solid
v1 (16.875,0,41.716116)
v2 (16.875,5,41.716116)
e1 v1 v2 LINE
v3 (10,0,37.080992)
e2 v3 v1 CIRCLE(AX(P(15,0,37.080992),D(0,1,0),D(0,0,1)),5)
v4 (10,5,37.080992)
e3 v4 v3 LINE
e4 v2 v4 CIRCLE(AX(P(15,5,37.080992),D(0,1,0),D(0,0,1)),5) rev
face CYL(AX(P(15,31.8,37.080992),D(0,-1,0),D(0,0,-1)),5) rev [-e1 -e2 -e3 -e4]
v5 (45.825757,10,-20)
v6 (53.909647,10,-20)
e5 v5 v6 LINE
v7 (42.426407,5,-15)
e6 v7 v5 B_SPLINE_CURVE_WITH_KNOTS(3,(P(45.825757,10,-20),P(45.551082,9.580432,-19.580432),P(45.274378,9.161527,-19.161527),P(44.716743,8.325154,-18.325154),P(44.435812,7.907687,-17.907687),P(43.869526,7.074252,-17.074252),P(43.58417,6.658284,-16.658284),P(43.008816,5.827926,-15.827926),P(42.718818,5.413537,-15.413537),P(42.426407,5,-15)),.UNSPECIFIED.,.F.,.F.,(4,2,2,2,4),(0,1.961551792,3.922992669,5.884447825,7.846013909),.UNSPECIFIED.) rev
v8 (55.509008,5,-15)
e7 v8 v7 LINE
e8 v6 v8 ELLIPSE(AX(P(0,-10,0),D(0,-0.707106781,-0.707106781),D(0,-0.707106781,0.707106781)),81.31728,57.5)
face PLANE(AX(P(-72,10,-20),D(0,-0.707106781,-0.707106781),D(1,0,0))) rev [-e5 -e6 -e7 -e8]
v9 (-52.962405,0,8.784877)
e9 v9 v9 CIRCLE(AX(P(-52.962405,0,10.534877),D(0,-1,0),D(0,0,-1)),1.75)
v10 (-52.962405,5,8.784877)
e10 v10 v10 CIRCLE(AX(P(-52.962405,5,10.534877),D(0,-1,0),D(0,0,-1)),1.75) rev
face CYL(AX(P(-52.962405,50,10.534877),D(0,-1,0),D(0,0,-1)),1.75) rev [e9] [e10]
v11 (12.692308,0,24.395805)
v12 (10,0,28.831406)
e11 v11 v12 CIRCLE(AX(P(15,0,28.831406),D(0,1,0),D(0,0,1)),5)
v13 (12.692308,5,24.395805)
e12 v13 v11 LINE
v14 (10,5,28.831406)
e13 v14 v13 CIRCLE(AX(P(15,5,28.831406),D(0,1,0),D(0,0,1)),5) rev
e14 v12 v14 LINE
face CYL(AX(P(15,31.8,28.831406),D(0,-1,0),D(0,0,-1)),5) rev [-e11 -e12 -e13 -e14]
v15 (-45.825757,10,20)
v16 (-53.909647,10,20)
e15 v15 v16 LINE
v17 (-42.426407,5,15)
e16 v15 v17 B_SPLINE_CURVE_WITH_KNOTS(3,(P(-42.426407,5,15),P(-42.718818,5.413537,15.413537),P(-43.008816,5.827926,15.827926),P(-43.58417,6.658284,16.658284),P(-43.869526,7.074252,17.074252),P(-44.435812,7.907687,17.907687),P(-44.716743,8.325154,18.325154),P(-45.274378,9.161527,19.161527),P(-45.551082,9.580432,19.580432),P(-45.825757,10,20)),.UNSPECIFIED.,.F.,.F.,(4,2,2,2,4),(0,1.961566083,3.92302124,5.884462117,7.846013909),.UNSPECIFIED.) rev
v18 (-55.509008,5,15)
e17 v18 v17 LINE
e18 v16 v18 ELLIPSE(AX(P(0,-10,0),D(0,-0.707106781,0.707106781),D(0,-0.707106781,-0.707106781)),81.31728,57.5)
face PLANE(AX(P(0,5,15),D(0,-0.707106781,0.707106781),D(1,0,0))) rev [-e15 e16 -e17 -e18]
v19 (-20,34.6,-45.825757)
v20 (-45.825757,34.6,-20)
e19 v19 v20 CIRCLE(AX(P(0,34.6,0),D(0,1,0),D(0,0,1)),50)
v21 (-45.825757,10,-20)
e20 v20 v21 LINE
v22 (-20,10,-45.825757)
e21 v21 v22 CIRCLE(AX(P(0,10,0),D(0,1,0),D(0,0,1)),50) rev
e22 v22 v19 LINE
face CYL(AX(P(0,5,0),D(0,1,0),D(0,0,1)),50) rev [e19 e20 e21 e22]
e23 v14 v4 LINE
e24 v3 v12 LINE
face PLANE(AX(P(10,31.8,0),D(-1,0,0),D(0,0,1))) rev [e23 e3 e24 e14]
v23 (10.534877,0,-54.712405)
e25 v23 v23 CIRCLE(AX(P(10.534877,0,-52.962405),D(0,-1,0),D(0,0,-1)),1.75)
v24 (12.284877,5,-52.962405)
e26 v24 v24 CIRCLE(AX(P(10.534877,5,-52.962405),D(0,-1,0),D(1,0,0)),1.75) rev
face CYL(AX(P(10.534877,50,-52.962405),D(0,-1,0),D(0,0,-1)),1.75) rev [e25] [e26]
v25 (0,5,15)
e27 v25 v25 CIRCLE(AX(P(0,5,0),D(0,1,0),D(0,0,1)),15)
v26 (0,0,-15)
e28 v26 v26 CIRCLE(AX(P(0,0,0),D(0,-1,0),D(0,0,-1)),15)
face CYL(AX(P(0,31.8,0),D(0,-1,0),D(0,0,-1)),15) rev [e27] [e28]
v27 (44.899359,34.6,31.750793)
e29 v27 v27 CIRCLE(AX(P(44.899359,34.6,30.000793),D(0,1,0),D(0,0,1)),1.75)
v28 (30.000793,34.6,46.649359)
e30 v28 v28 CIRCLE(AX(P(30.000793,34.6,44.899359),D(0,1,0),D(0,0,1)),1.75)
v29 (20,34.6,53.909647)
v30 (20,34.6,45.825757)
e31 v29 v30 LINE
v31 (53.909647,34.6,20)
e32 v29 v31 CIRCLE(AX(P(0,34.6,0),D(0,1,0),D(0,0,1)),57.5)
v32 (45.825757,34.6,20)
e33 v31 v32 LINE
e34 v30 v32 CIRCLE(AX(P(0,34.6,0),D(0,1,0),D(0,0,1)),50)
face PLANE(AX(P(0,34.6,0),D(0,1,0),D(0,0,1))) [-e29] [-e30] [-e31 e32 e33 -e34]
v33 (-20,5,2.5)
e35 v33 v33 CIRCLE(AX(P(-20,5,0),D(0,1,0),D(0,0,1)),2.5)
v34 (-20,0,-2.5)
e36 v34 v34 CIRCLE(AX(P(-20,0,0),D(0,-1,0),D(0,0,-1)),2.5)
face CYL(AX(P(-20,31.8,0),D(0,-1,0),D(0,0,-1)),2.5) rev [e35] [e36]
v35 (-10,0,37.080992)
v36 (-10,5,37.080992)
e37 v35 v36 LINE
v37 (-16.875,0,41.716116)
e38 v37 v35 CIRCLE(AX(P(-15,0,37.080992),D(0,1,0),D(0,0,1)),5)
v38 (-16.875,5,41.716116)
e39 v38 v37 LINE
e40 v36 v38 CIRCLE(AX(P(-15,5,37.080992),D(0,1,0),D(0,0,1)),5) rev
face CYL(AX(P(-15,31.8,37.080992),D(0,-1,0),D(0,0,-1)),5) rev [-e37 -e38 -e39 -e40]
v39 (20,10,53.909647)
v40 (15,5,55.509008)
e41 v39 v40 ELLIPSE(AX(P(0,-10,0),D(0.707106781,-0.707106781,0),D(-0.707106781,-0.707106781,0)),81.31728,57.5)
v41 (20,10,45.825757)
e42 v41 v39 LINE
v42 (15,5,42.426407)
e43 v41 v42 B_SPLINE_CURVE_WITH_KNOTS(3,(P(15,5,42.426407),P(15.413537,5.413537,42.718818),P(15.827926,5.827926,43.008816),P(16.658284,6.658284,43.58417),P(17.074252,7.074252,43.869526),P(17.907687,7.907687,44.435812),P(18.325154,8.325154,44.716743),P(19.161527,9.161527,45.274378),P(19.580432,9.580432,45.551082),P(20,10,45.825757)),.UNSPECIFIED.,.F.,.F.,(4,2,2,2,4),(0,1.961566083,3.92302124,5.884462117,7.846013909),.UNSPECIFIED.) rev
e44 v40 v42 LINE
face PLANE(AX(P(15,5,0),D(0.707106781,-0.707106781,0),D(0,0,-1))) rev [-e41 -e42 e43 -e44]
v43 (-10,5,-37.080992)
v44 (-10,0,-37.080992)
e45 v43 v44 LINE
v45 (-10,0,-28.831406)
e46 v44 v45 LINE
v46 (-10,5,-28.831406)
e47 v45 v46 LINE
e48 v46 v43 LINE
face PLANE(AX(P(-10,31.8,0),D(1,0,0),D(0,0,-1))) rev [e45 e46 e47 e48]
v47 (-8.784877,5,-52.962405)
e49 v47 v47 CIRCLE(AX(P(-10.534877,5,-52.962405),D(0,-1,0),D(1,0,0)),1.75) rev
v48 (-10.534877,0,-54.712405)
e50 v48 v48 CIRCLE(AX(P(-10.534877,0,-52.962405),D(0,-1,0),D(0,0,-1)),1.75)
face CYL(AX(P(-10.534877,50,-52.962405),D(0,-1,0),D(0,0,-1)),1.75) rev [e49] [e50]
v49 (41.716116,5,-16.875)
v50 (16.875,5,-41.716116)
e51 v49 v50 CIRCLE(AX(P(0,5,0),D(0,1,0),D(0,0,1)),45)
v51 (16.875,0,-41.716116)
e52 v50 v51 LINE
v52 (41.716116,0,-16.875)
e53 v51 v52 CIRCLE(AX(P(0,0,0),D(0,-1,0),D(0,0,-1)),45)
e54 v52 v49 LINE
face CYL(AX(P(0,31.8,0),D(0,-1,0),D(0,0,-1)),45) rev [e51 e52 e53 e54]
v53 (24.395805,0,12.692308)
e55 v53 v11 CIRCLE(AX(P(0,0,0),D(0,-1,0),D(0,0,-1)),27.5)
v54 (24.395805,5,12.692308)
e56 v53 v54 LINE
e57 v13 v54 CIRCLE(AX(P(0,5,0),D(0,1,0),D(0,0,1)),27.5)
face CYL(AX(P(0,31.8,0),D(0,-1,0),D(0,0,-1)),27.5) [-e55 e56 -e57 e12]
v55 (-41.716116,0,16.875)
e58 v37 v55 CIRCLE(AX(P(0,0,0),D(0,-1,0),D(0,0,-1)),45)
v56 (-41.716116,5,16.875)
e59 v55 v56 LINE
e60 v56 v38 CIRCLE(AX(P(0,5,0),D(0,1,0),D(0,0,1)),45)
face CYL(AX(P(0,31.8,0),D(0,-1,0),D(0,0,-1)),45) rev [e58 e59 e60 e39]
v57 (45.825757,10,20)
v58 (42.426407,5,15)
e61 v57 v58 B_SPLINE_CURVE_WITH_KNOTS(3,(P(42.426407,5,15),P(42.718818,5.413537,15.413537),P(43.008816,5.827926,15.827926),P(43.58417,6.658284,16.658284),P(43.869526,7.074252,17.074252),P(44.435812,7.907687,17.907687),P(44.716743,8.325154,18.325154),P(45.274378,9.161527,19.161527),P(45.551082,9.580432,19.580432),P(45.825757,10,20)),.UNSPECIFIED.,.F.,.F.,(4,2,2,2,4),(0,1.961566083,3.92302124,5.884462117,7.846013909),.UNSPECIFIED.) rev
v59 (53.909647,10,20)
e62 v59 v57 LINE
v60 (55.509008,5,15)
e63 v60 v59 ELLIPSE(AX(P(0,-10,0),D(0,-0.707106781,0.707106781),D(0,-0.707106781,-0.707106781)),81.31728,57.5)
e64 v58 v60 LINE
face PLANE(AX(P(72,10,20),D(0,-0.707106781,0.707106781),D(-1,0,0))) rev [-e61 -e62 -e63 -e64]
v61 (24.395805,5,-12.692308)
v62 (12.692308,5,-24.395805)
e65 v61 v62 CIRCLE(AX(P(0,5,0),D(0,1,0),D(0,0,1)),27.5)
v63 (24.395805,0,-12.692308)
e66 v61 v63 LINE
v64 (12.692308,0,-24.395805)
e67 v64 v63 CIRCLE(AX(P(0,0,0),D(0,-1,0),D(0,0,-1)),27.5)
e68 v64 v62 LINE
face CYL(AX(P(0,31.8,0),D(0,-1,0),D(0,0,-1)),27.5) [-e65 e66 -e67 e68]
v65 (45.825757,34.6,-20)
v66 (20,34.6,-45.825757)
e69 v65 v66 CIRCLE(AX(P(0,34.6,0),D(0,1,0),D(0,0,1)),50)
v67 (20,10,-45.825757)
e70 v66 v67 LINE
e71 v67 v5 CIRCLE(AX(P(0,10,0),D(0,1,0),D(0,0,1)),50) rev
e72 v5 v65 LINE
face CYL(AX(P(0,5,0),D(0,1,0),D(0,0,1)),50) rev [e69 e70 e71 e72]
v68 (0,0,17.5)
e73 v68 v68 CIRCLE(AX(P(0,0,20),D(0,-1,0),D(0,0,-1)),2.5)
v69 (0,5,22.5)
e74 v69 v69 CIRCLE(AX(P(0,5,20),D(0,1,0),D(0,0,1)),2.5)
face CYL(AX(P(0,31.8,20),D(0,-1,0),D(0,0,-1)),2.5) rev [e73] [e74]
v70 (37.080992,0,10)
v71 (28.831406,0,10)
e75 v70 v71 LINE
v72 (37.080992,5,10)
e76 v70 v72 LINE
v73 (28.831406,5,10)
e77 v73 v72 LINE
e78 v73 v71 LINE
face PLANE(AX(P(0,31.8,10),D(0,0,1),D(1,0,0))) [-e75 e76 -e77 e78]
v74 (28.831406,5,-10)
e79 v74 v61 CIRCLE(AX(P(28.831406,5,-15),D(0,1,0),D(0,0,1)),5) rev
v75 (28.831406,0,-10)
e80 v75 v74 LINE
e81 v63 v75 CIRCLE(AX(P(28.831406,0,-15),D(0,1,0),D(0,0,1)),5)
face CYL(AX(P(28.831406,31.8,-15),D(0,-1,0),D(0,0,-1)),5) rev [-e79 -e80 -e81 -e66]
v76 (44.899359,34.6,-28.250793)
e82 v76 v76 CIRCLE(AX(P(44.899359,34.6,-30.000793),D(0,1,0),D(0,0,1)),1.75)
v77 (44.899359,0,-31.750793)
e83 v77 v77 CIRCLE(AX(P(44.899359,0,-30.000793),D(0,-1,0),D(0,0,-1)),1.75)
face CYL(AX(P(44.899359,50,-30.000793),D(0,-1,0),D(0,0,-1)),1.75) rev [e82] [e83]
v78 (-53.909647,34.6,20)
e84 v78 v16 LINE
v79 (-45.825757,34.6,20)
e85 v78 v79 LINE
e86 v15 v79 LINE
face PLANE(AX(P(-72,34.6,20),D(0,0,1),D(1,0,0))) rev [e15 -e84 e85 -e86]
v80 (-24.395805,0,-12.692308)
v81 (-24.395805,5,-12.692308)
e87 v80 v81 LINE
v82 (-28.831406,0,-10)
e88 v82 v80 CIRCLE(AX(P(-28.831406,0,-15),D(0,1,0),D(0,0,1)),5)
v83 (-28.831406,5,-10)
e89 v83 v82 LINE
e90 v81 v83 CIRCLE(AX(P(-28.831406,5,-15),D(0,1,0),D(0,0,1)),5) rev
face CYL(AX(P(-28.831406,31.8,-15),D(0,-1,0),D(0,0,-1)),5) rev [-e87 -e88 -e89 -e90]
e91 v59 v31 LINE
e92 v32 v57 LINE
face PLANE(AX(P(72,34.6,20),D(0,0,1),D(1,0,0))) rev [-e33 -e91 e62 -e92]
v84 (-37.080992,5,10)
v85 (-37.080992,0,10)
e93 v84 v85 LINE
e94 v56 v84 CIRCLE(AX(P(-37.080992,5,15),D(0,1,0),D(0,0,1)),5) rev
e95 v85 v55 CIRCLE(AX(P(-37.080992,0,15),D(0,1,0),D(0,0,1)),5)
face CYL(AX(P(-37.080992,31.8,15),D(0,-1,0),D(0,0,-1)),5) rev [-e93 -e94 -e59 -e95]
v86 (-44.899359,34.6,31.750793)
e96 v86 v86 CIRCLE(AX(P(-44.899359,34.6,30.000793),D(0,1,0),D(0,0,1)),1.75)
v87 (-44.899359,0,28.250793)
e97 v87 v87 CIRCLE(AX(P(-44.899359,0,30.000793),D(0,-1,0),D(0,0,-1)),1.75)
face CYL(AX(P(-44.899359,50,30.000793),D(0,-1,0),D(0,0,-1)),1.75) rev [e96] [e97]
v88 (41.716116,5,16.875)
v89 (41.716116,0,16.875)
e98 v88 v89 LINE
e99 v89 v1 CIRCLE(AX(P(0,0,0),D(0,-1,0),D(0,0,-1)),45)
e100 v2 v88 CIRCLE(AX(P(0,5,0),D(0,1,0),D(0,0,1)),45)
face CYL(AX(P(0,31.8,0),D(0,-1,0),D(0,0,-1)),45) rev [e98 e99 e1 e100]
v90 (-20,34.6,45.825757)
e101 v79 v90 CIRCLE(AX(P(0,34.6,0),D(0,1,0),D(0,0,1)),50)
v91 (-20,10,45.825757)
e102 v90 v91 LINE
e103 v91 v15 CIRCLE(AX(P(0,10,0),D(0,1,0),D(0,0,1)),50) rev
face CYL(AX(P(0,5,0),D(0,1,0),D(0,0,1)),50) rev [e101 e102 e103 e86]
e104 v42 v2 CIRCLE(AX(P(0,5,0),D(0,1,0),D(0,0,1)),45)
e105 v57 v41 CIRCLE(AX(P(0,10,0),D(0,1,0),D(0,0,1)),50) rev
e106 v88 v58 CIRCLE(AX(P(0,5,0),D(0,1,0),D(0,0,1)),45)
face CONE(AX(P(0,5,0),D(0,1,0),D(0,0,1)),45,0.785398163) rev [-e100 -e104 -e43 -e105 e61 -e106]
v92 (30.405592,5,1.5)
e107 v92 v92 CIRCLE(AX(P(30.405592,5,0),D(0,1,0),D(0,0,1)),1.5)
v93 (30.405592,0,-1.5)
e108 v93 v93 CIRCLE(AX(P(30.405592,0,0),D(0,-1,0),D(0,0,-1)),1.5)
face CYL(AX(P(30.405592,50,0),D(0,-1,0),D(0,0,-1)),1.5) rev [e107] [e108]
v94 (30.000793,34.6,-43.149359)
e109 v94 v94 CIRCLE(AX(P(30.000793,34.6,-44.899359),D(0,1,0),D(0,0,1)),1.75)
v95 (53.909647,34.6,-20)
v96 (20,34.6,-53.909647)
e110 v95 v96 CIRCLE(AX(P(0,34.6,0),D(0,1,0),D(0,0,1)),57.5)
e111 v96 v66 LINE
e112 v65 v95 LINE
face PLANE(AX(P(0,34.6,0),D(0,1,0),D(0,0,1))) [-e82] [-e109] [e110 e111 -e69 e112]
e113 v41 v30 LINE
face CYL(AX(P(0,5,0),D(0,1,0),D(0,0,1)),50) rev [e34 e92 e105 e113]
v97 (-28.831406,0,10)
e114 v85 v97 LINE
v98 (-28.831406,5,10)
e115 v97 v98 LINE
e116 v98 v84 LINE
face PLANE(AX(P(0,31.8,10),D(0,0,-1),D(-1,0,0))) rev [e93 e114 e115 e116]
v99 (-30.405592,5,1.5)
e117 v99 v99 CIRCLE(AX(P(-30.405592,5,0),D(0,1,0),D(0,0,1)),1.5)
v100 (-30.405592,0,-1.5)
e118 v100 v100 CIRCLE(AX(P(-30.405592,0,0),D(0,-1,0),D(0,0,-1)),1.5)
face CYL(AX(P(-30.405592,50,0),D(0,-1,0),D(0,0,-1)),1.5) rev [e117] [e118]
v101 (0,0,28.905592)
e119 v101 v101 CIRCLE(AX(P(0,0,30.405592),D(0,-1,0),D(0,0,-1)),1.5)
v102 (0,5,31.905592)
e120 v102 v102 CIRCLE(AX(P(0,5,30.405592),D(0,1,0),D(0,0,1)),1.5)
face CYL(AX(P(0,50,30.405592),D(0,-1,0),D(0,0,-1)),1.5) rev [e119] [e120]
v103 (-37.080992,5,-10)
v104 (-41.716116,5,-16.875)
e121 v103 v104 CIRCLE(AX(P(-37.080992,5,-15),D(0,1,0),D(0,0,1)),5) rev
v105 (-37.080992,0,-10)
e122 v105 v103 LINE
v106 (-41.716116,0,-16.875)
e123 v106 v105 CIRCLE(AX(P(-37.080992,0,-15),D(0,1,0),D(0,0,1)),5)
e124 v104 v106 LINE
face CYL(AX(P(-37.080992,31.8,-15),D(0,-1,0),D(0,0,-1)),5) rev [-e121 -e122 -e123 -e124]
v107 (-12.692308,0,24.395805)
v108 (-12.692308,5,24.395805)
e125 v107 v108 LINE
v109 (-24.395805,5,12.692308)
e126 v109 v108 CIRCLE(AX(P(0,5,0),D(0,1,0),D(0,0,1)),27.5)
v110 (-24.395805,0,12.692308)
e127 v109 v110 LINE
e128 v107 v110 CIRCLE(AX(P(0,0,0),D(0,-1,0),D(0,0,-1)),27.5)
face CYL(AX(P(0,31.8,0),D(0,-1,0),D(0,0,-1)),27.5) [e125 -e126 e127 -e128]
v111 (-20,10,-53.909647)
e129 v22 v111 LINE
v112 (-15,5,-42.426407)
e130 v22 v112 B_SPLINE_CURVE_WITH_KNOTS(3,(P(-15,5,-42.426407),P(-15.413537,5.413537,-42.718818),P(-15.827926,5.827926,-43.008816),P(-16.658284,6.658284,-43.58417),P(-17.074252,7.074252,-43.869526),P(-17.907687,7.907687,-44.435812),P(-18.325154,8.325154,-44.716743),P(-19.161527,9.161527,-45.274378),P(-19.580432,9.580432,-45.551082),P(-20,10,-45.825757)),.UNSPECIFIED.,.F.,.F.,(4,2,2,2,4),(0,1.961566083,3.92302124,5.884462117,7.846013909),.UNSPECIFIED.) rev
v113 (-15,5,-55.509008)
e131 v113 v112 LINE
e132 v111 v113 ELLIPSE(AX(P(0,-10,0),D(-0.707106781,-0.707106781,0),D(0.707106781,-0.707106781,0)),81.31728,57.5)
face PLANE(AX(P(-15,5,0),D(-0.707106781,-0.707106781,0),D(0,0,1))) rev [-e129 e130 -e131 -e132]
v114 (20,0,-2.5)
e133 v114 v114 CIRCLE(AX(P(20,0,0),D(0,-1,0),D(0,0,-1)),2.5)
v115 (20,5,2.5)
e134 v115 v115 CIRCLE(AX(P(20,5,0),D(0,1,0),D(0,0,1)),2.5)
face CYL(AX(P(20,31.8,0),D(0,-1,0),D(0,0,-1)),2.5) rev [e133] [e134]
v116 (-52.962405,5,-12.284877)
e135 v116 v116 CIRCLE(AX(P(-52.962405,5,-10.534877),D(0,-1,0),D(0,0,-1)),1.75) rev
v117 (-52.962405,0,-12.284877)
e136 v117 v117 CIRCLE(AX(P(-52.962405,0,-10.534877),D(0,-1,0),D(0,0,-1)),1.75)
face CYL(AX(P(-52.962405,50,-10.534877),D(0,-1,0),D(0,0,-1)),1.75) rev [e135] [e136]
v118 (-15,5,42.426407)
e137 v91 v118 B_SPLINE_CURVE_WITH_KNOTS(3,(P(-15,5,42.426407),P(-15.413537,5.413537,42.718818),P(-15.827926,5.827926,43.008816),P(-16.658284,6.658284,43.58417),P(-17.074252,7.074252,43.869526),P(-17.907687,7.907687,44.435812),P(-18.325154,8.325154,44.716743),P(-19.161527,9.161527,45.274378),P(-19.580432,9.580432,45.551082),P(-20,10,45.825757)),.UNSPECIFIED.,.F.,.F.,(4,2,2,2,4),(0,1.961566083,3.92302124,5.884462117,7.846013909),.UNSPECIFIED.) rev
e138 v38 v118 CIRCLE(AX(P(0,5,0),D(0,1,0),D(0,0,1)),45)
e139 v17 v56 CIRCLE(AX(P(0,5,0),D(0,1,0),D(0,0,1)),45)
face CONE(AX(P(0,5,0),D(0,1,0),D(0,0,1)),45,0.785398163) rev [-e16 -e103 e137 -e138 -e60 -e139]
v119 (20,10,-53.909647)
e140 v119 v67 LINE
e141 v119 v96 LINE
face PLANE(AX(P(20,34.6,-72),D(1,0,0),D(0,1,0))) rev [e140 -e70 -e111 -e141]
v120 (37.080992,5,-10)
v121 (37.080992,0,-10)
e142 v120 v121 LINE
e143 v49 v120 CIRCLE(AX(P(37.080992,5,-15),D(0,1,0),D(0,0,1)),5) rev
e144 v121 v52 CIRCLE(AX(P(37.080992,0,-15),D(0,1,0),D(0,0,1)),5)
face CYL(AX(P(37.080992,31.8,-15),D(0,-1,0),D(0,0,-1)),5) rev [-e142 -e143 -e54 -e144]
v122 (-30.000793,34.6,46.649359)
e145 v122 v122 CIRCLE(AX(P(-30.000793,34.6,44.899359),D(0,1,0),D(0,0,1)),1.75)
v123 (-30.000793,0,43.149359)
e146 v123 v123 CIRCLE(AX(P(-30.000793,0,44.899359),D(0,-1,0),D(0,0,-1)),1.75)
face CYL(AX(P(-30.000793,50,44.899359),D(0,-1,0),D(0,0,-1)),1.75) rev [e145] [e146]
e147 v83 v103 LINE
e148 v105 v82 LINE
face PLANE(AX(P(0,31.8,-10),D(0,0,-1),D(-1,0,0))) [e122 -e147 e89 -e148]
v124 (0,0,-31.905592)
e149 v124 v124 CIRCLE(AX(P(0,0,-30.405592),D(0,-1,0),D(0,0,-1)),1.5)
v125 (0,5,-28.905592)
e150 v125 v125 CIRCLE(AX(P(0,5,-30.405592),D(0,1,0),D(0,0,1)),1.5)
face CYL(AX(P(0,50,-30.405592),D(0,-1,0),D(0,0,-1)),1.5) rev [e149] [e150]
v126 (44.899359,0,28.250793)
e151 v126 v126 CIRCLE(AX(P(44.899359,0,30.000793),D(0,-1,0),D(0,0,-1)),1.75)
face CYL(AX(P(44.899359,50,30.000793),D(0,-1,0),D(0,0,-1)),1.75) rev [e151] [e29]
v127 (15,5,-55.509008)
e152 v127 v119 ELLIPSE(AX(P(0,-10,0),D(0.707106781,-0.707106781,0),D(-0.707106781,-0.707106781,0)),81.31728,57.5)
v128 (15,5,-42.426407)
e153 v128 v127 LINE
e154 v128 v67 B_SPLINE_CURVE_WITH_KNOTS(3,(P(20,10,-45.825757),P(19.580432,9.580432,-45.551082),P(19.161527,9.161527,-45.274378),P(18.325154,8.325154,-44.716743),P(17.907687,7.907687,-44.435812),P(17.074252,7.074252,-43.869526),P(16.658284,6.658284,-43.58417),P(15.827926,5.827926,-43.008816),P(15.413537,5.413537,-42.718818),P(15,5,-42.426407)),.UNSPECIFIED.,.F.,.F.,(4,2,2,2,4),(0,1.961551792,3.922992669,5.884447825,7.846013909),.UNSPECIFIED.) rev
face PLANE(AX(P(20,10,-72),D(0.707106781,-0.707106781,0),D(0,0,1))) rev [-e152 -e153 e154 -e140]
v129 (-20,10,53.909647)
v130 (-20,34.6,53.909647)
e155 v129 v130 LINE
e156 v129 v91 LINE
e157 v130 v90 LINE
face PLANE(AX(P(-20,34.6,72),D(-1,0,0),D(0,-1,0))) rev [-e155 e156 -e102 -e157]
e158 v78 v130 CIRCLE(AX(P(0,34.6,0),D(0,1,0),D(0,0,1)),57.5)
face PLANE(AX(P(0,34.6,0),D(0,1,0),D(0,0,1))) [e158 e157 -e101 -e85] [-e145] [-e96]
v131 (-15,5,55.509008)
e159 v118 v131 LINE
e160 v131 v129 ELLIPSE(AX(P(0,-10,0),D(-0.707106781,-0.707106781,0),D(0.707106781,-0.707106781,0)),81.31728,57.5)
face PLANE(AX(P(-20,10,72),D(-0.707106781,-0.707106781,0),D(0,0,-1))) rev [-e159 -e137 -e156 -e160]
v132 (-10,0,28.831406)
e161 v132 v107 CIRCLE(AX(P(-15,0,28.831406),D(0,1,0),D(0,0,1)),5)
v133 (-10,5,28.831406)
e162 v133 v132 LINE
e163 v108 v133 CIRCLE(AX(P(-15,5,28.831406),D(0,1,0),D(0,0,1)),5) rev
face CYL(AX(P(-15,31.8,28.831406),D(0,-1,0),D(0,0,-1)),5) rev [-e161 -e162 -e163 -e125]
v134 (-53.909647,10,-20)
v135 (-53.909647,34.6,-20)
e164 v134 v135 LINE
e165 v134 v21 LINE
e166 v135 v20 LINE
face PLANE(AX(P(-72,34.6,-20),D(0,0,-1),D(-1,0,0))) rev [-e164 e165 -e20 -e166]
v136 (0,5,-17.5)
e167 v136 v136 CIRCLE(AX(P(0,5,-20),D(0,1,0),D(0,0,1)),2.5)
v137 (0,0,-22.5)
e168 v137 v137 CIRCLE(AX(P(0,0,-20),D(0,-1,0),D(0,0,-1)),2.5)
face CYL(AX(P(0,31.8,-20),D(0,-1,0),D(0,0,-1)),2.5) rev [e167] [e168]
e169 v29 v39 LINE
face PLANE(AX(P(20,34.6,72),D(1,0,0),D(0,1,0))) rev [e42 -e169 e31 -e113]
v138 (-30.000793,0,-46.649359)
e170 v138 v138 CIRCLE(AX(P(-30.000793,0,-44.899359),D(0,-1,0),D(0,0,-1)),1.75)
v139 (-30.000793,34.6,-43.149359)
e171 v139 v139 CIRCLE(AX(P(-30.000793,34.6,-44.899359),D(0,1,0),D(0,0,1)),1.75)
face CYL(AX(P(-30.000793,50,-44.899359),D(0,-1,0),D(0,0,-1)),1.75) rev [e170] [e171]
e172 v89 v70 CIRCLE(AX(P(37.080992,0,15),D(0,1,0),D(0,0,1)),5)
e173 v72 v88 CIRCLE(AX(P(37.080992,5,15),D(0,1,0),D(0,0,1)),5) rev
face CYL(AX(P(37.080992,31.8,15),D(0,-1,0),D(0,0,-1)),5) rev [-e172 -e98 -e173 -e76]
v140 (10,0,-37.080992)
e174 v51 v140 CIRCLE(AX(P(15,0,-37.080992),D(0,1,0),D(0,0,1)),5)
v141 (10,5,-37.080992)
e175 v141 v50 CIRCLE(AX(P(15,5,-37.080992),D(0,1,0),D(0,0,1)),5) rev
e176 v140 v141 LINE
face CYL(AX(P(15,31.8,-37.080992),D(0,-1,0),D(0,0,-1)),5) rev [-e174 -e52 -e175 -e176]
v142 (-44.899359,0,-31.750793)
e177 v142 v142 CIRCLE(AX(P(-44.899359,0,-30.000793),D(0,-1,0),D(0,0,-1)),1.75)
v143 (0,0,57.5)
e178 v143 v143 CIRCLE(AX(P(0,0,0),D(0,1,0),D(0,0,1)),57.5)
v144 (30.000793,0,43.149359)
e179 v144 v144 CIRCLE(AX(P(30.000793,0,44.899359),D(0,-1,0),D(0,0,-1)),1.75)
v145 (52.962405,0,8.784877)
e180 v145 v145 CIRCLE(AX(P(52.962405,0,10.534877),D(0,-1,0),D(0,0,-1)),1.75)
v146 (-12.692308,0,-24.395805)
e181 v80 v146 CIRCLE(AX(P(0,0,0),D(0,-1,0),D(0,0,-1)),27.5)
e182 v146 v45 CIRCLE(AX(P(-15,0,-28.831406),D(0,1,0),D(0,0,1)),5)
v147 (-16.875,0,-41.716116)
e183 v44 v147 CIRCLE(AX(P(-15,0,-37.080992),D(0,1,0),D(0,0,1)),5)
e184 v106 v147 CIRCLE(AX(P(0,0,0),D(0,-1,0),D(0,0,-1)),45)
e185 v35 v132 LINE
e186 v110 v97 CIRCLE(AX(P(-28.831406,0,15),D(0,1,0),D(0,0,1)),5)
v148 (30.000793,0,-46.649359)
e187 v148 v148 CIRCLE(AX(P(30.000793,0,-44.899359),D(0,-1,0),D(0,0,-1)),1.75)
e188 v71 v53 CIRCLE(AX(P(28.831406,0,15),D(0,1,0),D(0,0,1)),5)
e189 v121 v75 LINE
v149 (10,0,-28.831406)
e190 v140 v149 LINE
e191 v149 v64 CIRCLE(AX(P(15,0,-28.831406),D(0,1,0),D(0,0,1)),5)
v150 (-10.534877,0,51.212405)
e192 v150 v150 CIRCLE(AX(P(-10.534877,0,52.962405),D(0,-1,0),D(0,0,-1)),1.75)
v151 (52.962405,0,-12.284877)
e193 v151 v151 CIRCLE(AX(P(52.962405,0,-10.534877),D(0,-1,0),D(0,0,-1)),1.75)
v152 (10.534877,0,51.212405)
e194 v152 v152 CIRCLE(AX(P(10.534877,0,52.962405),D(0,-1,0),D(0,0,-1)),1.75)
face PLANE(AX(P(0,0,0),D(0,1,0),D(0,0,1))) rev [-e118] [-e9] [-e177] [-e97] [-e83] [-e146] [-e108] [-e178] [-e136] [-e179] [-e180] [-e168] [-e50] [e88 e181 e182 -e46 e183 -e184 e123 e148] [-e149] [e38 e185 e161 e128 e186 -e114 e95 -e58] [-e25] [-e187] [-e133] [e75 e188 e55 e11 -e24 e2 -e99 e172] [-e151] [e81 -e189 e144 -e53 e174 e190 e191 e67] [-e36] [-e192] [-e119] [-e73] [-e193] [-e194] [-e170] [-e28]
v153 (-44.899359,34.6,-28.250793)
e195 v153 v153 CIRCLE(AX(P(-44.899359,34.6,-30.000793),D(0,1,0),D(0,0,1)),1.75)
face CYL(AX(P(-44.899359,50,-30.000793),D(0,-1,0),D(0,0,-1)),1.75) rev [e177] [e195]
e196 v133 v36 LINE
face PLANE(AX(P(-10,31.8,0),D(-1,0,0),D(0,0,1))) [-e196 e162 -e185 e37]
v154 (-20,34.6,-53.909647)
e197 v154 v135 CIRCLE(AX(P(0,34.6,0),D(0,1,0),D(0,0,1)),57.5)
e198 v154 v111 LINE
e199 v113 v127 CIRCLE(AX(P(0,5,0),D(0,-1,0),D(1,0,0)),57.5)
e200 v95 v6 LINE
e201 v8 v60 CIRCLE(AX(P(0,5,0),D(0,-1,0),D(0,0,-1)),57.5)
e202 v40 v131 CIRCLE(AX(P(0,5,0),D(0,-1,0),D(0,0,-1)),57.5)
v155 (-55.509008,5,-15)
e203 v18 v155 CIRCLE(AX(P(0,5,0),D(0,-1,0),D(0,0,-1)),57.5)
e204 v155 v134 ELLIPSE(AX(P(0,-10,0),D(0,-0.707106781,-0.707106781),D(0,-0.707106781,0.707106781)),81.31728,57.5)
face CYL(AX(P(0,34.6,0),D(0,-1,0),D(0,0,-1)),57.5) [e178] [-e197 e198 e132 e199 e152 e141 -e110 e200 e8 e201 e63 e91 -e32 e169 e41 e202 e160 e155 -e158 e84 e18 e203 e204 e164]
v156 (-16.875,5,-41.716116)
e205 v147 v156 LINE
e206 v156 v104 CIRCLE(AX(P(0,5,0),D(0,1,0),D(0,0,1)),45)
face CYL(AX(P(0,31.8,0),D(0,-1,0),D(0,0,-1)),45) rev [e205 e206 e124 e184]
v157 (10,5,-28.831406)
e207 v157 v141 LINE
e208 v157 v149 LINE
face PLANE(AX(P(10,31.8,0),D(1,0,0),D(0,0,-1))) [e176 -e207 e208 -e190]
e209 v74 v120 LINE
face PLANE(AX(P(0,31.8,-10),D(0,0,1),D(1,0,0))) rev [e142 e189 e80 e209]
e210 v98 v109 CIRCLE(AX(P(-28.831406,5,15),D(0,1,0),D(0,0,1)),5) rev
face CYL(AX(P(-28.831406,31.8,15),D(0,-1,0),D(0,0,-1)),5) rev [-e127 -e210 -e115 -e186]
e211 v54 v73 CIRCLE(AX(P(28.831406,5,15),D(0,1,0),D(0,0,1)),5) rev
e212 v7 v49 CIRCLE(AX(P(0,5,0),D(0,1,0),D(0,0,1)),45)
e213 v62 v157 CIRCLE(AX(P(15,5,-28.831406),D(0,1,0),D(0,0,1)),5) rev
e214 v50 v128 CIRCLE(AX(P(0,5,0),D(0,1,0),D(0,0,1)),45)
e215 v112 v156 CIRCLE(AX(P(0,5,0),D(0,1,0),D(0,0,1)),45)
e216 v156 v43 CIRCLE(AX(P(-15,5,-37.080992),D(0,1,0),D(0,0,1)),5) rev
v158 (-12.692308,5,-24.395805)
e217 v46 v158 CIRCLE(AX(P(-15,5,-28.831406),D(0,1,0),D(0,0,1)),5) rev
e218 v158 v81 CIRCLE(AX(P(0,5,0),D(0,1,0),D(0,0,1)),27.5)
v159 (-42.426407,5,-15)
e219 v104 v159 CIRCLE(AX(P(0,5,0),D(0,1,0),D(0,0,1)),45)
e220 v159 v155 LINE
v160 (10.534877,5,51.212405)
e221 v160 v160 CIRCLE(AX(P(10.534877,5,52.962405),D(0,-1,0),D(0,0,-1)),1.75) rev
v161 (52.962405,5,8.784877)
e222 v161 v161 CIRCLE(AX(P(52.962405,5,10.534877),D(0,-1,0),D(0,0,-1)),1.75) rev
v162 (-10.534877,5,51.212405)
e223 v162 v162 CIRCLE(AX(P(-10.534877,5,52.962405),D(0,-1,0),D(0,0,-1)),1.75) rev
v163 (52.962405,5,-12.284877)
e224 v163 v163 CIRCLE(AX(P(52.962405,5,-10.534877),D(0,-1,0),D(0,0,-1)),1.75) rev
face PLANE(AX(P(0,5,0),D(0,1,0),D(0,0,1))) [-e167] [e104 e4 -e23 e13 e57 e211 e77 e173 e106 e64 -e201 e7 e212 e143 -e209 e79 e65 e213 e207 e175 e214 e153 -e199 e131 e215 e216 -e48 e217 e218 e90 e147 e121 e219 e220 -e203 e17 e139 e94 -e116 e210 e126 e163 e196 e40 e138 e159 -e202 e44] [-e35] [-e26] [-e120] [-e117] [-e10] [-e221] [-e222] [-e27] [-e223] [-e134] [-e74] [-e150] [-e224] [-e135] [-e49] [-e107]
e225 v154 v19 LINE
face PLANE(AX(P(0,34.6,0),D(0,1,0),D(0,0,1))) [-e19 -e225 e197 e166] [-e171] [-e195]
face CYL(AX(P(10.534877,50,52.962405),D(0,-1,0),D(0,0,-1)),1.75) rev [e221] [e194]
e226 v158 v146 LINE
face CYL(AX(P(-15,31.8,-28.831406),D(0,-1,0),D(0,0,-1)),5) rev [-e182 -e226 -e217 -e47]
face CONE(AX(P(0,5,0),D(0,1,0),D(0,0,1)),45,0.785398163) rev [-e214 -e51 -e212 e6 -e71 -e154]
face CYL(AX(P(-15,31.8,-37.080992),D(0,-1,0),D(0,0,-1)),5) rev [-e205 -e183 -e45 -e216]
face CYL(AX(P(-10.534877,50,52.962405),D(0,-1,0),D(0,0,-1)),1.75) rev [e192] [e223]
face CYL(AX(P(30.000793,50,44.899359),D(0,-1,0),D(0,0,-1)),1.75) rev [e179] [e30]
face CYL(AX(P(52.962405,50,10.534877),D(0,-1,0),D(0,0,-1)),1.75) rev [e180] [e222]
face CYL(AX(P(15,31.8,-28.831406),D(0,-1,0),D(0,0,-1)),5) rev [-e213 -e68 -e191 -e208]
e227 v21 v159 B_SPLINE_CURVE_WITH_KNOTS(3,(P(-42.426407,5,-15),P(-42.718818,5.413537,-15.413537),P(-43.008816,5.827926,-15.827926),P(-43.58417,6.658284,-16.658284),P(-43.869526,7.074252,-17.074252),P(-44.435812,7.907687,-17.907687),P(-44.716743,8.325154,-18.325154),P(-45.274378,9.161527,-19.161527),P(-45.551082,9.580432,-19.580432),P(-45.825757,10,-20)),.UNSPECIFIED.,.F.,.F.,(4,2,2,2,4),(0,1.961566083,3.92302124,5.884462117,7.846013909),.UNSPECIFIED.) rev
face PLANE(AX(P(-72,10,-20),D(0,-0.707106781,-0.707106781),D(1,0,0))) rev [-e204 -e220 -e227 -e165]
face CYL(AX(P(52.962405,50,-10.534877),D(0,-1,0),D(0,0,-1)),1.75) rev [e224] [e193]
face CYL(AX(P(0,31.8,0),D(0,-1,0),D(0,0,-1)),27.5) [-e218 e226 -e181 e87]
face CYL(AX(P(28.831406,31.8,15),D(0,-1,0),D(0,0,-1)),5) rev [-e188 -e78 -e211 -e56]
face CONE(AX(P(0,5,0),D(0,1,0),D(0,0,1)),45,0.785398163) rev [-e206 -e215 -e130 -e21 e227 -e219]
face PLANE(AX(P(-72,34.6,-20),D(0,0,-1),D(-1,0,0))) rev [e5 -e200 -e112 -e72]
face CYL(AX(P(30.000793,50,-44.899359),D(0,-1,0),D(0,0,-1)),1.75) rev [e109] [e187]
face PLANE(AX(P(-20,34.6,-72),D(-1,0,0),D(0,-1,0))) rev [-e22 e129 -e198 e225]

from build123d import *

# Parameters (mm, degrees)
SKETCH1_R           = 57.5
BOSS_EXTRUDE1_DEPTH = 34.6
SKETCH2_R           = 50
CUT_EXTRUDE1_DEPTH  = 29.6
SKETCH3_R           = 2.5
SKETCH3_R_2         = 15
CUT_EXTRUDE2_DEPTH  = 31.8
SKETCH4_R           = 1.5
SKETCH4_R_2         = 1.75
CUT_EXTRUDE3_DEPTH  = 50
SKETCH9_W           = 40
SKETCH9_H           = 29.6
CUT_EXTRUDE4_DEPTH  = 72
CIRPATTERN1_COUNT   = 4
FILLET2_R           = 5
CHAMFER1_SIZE       = 5


with BuildPart() as part:
    # Sketch1 → Boss-Extrude1 (new body)
    with BuildSketch(Plane(origin=(0, 0, 0), x_dir=(1, 0, 0), z_dir=(0, 1, 0))):
        with Locations(Location((0, 0, 0), (0, 0, 270))):
            Circle(SKETCH1_R)
    extrude(amount=BOSS_EXTRUDE1_DEPTH)

    # Sketch2 → Cut-Extrude1 (cut)
    with BuildSketch(Plane(origin=(0, 34.6, 0), x_dir=(1, 0, 0), z_dir=(0, 1, 0))):
        with Locations(Location((0, 0, 0), (0, 0, 270))):
            Circle(SKETCH2_R)
    extrude(amount=-CUT_EXTRUDE1_DEPTH, mode=Mode.SUBTRACT)

    # Sketch3 → Cut-Extrude2 (cut)
    with BuildSketch(Plane.XZ):
        with BuildLine():
            Line((-10, 25.617376915), (-10, 43.874821937))
            ThreePointArc((-10, 43.874821937), (-31.819805153, 31.819805153), (-43.874821937, 10))
            Line((-43.874821937, 10), (-25.617376915, 10))
            ThreePointArc((-25.617376915, 10), (-19.445436483, 19.445436483), (-10, 25.617376915))
        make_face()
        with BuildLine():
            Line((25.617376915, 10), (43.874821937, 10))
            ThreePointArc((43.874821937, 10), (31.819805153, 31.819805153), (10, 43.874821937))
            Line((10, 43.874821937), (10, 25.617376915))
            ThreePointArc((10, 25.617376915), (19.445436483, 19.445436483), (25.617376915, 10))
        make_face()
        with BuildLine():
            ThreePointArc((10, -43.874821937), (31.819805153, -31.819805153), (43.874821937, -10))
            Line((43.874821937, -10), (25.617376915, -10))
            ThreePointArc((25.617376915, -10), (19.445436483, -19.445436483), (10, -25.617376915))
            Line((10, -25.617376915), (10, -43.874821937))
        make_face()
        with BuildLine():
            ThreePointArc((-43.874821937, -10), (-31.819805153, -31.819805153), (-10, -43.874821937))
            Line((-10, -43.874821937), (-10, -25.617376915))
            ThreePointArc((-10, -25.617376915), (-19.445436483, -19.445436483), (-25.617376915, -10))
            Line((-25.617376915, -10), (-43.874821937, -10))
        make_face()
        with Locations(Location((-20, 0, 0), (0, 0, 270))):
            Circle(SKETCH3_R)
        with Locations(Location((0, 0, 0), (0, 0, 270))):
            Circle(SKETCH3_R_2)
        with Locations(Location((0, 20, 0), (0, 0, 270))):
            Circle(SKETCH3_R)
        with Locations(Location((20, 0, 0), (0, 0, 270))):
            Circle(SKETCH3_R)
        with Locations(Location((0, -20, 0), (0, 0, 270))):
            Circle(SKETCH3_R)
    extrude(amount=-CUT_EXTRUDE2_DEPTH, mode=Mode.SUBTRACT)

    # Sketch4 → Cut-Extrude3 (cut)
    with BuildSketch(Plane.XZ):
        with Locations(Location((0, 30.405591591, 0), (0, 0, 270))):
            Circle(SKETCH4_R)
        with Locations(Location((30.405591591, 0, 0), (0, 0, 270))):
            Circle(SKETCH4_R)
        with Locations(Location((0, -30.405591591, 0), (0, 0, 270))):
            Circle(SKETCH4_R)
        with Locations(Location((-30.405591591, 0, 0), (0, 0, 270))):
            Circle(SKETCH4_R)
        with Locations(Location((-10.534877389, 52.962405142, 0), (0, 0, 270))):
            Circle(SKETCH4_R_2)
        with Locations(Location((10.534877389, 52.962405142, 0), (0, 0, 270))):
            Circle(SKETCH4_R_2)
        with Locations(Location((30.000792583, 44.899359064, 0), (0, 0, 270))):
            Circle(SKETCH4_R_2)
        with Locations(Location((44.899359064, 30.000792583, 0), (0, 0, 270))):
            Circle(SKETCH4_R_2)
        with Locations(Location((52.962405142, 10.534877389, 0), (0, 0, 270))):
            Circle(SKETCH4_R_2)
        with Locations(Location((52.962405142, -10.534877389, 0), (0, 0, 270))):
            Circle(SKETCH4_R_2)
        with Locations(Location((44.899359064, -30.000792583, 0), (0, 0, 270))):
            Circle(SKETCH4_R_2)
        with Locations(Location((30.000792583, -44.899359064, 0), (0, 0, 270))):
            Circle(SKETCH4_R_2)
        with Locations(Location((10.534877389, -52.962405142, 0), (0, 0, 270))):
            Circle(SKETCH4_R_2)
        with Locations(Location((-10.534877389, -52.962405142, 0), (0, 0, 270))):
            Circle(SKETCH4_R_2)
        with Locations(Location((-30.000792583, -44.899359064, 0), (0, 0, 270))):
            Circle(SKETCH4_R_2)
        with Locations(Location((-44.899359064, -30.000792583, 0), (0, 0, 270))):
            Circle(SKETCH4_R_2)
        with Locations(Location((-52.962405142, -10.534877389, 0), (0, 0, 270))):
            Circle(SKETCH4_R_2)
        with Locations(Location((-52.962405142, 10.534877389, 0), (0, 0, 270))):
            Circle(SKETCH4_R_2)
        with Locations(Location((-44.899359064, 30.000792583, 0), (0, 0, 270))):
            Circle(SKETCH4_R_2)
        with Locations(Location((-30.000792583, 44.899359064, 0), (0, 0, 270))):
            Circle(SKETCH4_R_2)
    extrude(amount=-CUT_EXTRUDE3_DEPTH, mode=Mode.SUBTRACT)

    # Sketch9 → Cut-Extrude4 (cut)
    with BuildSketch(Plane.XY):
        with Locations((0, 19.8)):
            Rectangle(SKETCH9_W, SKETCH9_H)
    cut_extrude4 = extrude(amount=-CUT_EXTRUDE4_DEPTH, mode=Mode.SUBTRACT)

    # CirPattern1: Cut-Extrude4 ×4 about axis
    cirpattern1_axis = Axis((0, 0, 0), (0, 1, 0))
    for i in range(1, CIRPATTERN1_COUNT):
        add(cut_extrude4.rotate(cirpattern1_axis, i * 360 / CIRPATTERN1_COUNT), mode=Mode.SUBTRACT)

    # Fillet2
    fillet2_edges = [part.edges().sort_by_distance(p)[0] for p in [
        (43.874821937, 2.5, 10),
        (25.617376915, 2.5, 10),
        (10, 2.5, 25.617376915),
        (10, 2.5, 43.874821937),
        (10, 2.5, -43.874821937),
        (10, 2.5, -25.617376915),
        (25.617376915, 2.5, -10),
        (43.874821937, 2.5, -10),
        (-43.874821937, 2.5, -10),
        (-25.617376915, 2.5, -10),
        (-10, 2.5, -25.617376915),
        (-10, 2.5, -43.874821937),
        (-10, 2.5, 43.874821937),
        (-10, 2.5, 25.617376915),
        (-25.617376915, 2.5, 10),
        (-43.874821937, 2.5, 10),
    ]]
    fillet(fillet2_edges, radius=FILLET2_R)

    # Chamfer1
    chamfer1_edges = [part.edges().sort_by_distance(p)[0] for p in [
        (-35.355339059, 5, -35.355339059),
        (-20, 5, -49.867701791),
        (20, 5, -49.867701791),
        (-35.355339059, 5, 35.355339059),
        (35.355339059, 5, 35.355339059),
        (35.355339059, 5, -35.355339059),
        (-49.867701791, 5, 20),
        (20, 5, 49.867701791),
        (49.867701791, 5, -20),
        (49.867701791, 5, 20),
        (-20, 5, 49.867701791),
        (-49.867701791, 5, -20),
    ]]
    chamfer(chamfer1_edges, length=CHAMFER1_SIZE - 0.0001)  # a hair under: the kernel refuses the full size


solid = part.part
